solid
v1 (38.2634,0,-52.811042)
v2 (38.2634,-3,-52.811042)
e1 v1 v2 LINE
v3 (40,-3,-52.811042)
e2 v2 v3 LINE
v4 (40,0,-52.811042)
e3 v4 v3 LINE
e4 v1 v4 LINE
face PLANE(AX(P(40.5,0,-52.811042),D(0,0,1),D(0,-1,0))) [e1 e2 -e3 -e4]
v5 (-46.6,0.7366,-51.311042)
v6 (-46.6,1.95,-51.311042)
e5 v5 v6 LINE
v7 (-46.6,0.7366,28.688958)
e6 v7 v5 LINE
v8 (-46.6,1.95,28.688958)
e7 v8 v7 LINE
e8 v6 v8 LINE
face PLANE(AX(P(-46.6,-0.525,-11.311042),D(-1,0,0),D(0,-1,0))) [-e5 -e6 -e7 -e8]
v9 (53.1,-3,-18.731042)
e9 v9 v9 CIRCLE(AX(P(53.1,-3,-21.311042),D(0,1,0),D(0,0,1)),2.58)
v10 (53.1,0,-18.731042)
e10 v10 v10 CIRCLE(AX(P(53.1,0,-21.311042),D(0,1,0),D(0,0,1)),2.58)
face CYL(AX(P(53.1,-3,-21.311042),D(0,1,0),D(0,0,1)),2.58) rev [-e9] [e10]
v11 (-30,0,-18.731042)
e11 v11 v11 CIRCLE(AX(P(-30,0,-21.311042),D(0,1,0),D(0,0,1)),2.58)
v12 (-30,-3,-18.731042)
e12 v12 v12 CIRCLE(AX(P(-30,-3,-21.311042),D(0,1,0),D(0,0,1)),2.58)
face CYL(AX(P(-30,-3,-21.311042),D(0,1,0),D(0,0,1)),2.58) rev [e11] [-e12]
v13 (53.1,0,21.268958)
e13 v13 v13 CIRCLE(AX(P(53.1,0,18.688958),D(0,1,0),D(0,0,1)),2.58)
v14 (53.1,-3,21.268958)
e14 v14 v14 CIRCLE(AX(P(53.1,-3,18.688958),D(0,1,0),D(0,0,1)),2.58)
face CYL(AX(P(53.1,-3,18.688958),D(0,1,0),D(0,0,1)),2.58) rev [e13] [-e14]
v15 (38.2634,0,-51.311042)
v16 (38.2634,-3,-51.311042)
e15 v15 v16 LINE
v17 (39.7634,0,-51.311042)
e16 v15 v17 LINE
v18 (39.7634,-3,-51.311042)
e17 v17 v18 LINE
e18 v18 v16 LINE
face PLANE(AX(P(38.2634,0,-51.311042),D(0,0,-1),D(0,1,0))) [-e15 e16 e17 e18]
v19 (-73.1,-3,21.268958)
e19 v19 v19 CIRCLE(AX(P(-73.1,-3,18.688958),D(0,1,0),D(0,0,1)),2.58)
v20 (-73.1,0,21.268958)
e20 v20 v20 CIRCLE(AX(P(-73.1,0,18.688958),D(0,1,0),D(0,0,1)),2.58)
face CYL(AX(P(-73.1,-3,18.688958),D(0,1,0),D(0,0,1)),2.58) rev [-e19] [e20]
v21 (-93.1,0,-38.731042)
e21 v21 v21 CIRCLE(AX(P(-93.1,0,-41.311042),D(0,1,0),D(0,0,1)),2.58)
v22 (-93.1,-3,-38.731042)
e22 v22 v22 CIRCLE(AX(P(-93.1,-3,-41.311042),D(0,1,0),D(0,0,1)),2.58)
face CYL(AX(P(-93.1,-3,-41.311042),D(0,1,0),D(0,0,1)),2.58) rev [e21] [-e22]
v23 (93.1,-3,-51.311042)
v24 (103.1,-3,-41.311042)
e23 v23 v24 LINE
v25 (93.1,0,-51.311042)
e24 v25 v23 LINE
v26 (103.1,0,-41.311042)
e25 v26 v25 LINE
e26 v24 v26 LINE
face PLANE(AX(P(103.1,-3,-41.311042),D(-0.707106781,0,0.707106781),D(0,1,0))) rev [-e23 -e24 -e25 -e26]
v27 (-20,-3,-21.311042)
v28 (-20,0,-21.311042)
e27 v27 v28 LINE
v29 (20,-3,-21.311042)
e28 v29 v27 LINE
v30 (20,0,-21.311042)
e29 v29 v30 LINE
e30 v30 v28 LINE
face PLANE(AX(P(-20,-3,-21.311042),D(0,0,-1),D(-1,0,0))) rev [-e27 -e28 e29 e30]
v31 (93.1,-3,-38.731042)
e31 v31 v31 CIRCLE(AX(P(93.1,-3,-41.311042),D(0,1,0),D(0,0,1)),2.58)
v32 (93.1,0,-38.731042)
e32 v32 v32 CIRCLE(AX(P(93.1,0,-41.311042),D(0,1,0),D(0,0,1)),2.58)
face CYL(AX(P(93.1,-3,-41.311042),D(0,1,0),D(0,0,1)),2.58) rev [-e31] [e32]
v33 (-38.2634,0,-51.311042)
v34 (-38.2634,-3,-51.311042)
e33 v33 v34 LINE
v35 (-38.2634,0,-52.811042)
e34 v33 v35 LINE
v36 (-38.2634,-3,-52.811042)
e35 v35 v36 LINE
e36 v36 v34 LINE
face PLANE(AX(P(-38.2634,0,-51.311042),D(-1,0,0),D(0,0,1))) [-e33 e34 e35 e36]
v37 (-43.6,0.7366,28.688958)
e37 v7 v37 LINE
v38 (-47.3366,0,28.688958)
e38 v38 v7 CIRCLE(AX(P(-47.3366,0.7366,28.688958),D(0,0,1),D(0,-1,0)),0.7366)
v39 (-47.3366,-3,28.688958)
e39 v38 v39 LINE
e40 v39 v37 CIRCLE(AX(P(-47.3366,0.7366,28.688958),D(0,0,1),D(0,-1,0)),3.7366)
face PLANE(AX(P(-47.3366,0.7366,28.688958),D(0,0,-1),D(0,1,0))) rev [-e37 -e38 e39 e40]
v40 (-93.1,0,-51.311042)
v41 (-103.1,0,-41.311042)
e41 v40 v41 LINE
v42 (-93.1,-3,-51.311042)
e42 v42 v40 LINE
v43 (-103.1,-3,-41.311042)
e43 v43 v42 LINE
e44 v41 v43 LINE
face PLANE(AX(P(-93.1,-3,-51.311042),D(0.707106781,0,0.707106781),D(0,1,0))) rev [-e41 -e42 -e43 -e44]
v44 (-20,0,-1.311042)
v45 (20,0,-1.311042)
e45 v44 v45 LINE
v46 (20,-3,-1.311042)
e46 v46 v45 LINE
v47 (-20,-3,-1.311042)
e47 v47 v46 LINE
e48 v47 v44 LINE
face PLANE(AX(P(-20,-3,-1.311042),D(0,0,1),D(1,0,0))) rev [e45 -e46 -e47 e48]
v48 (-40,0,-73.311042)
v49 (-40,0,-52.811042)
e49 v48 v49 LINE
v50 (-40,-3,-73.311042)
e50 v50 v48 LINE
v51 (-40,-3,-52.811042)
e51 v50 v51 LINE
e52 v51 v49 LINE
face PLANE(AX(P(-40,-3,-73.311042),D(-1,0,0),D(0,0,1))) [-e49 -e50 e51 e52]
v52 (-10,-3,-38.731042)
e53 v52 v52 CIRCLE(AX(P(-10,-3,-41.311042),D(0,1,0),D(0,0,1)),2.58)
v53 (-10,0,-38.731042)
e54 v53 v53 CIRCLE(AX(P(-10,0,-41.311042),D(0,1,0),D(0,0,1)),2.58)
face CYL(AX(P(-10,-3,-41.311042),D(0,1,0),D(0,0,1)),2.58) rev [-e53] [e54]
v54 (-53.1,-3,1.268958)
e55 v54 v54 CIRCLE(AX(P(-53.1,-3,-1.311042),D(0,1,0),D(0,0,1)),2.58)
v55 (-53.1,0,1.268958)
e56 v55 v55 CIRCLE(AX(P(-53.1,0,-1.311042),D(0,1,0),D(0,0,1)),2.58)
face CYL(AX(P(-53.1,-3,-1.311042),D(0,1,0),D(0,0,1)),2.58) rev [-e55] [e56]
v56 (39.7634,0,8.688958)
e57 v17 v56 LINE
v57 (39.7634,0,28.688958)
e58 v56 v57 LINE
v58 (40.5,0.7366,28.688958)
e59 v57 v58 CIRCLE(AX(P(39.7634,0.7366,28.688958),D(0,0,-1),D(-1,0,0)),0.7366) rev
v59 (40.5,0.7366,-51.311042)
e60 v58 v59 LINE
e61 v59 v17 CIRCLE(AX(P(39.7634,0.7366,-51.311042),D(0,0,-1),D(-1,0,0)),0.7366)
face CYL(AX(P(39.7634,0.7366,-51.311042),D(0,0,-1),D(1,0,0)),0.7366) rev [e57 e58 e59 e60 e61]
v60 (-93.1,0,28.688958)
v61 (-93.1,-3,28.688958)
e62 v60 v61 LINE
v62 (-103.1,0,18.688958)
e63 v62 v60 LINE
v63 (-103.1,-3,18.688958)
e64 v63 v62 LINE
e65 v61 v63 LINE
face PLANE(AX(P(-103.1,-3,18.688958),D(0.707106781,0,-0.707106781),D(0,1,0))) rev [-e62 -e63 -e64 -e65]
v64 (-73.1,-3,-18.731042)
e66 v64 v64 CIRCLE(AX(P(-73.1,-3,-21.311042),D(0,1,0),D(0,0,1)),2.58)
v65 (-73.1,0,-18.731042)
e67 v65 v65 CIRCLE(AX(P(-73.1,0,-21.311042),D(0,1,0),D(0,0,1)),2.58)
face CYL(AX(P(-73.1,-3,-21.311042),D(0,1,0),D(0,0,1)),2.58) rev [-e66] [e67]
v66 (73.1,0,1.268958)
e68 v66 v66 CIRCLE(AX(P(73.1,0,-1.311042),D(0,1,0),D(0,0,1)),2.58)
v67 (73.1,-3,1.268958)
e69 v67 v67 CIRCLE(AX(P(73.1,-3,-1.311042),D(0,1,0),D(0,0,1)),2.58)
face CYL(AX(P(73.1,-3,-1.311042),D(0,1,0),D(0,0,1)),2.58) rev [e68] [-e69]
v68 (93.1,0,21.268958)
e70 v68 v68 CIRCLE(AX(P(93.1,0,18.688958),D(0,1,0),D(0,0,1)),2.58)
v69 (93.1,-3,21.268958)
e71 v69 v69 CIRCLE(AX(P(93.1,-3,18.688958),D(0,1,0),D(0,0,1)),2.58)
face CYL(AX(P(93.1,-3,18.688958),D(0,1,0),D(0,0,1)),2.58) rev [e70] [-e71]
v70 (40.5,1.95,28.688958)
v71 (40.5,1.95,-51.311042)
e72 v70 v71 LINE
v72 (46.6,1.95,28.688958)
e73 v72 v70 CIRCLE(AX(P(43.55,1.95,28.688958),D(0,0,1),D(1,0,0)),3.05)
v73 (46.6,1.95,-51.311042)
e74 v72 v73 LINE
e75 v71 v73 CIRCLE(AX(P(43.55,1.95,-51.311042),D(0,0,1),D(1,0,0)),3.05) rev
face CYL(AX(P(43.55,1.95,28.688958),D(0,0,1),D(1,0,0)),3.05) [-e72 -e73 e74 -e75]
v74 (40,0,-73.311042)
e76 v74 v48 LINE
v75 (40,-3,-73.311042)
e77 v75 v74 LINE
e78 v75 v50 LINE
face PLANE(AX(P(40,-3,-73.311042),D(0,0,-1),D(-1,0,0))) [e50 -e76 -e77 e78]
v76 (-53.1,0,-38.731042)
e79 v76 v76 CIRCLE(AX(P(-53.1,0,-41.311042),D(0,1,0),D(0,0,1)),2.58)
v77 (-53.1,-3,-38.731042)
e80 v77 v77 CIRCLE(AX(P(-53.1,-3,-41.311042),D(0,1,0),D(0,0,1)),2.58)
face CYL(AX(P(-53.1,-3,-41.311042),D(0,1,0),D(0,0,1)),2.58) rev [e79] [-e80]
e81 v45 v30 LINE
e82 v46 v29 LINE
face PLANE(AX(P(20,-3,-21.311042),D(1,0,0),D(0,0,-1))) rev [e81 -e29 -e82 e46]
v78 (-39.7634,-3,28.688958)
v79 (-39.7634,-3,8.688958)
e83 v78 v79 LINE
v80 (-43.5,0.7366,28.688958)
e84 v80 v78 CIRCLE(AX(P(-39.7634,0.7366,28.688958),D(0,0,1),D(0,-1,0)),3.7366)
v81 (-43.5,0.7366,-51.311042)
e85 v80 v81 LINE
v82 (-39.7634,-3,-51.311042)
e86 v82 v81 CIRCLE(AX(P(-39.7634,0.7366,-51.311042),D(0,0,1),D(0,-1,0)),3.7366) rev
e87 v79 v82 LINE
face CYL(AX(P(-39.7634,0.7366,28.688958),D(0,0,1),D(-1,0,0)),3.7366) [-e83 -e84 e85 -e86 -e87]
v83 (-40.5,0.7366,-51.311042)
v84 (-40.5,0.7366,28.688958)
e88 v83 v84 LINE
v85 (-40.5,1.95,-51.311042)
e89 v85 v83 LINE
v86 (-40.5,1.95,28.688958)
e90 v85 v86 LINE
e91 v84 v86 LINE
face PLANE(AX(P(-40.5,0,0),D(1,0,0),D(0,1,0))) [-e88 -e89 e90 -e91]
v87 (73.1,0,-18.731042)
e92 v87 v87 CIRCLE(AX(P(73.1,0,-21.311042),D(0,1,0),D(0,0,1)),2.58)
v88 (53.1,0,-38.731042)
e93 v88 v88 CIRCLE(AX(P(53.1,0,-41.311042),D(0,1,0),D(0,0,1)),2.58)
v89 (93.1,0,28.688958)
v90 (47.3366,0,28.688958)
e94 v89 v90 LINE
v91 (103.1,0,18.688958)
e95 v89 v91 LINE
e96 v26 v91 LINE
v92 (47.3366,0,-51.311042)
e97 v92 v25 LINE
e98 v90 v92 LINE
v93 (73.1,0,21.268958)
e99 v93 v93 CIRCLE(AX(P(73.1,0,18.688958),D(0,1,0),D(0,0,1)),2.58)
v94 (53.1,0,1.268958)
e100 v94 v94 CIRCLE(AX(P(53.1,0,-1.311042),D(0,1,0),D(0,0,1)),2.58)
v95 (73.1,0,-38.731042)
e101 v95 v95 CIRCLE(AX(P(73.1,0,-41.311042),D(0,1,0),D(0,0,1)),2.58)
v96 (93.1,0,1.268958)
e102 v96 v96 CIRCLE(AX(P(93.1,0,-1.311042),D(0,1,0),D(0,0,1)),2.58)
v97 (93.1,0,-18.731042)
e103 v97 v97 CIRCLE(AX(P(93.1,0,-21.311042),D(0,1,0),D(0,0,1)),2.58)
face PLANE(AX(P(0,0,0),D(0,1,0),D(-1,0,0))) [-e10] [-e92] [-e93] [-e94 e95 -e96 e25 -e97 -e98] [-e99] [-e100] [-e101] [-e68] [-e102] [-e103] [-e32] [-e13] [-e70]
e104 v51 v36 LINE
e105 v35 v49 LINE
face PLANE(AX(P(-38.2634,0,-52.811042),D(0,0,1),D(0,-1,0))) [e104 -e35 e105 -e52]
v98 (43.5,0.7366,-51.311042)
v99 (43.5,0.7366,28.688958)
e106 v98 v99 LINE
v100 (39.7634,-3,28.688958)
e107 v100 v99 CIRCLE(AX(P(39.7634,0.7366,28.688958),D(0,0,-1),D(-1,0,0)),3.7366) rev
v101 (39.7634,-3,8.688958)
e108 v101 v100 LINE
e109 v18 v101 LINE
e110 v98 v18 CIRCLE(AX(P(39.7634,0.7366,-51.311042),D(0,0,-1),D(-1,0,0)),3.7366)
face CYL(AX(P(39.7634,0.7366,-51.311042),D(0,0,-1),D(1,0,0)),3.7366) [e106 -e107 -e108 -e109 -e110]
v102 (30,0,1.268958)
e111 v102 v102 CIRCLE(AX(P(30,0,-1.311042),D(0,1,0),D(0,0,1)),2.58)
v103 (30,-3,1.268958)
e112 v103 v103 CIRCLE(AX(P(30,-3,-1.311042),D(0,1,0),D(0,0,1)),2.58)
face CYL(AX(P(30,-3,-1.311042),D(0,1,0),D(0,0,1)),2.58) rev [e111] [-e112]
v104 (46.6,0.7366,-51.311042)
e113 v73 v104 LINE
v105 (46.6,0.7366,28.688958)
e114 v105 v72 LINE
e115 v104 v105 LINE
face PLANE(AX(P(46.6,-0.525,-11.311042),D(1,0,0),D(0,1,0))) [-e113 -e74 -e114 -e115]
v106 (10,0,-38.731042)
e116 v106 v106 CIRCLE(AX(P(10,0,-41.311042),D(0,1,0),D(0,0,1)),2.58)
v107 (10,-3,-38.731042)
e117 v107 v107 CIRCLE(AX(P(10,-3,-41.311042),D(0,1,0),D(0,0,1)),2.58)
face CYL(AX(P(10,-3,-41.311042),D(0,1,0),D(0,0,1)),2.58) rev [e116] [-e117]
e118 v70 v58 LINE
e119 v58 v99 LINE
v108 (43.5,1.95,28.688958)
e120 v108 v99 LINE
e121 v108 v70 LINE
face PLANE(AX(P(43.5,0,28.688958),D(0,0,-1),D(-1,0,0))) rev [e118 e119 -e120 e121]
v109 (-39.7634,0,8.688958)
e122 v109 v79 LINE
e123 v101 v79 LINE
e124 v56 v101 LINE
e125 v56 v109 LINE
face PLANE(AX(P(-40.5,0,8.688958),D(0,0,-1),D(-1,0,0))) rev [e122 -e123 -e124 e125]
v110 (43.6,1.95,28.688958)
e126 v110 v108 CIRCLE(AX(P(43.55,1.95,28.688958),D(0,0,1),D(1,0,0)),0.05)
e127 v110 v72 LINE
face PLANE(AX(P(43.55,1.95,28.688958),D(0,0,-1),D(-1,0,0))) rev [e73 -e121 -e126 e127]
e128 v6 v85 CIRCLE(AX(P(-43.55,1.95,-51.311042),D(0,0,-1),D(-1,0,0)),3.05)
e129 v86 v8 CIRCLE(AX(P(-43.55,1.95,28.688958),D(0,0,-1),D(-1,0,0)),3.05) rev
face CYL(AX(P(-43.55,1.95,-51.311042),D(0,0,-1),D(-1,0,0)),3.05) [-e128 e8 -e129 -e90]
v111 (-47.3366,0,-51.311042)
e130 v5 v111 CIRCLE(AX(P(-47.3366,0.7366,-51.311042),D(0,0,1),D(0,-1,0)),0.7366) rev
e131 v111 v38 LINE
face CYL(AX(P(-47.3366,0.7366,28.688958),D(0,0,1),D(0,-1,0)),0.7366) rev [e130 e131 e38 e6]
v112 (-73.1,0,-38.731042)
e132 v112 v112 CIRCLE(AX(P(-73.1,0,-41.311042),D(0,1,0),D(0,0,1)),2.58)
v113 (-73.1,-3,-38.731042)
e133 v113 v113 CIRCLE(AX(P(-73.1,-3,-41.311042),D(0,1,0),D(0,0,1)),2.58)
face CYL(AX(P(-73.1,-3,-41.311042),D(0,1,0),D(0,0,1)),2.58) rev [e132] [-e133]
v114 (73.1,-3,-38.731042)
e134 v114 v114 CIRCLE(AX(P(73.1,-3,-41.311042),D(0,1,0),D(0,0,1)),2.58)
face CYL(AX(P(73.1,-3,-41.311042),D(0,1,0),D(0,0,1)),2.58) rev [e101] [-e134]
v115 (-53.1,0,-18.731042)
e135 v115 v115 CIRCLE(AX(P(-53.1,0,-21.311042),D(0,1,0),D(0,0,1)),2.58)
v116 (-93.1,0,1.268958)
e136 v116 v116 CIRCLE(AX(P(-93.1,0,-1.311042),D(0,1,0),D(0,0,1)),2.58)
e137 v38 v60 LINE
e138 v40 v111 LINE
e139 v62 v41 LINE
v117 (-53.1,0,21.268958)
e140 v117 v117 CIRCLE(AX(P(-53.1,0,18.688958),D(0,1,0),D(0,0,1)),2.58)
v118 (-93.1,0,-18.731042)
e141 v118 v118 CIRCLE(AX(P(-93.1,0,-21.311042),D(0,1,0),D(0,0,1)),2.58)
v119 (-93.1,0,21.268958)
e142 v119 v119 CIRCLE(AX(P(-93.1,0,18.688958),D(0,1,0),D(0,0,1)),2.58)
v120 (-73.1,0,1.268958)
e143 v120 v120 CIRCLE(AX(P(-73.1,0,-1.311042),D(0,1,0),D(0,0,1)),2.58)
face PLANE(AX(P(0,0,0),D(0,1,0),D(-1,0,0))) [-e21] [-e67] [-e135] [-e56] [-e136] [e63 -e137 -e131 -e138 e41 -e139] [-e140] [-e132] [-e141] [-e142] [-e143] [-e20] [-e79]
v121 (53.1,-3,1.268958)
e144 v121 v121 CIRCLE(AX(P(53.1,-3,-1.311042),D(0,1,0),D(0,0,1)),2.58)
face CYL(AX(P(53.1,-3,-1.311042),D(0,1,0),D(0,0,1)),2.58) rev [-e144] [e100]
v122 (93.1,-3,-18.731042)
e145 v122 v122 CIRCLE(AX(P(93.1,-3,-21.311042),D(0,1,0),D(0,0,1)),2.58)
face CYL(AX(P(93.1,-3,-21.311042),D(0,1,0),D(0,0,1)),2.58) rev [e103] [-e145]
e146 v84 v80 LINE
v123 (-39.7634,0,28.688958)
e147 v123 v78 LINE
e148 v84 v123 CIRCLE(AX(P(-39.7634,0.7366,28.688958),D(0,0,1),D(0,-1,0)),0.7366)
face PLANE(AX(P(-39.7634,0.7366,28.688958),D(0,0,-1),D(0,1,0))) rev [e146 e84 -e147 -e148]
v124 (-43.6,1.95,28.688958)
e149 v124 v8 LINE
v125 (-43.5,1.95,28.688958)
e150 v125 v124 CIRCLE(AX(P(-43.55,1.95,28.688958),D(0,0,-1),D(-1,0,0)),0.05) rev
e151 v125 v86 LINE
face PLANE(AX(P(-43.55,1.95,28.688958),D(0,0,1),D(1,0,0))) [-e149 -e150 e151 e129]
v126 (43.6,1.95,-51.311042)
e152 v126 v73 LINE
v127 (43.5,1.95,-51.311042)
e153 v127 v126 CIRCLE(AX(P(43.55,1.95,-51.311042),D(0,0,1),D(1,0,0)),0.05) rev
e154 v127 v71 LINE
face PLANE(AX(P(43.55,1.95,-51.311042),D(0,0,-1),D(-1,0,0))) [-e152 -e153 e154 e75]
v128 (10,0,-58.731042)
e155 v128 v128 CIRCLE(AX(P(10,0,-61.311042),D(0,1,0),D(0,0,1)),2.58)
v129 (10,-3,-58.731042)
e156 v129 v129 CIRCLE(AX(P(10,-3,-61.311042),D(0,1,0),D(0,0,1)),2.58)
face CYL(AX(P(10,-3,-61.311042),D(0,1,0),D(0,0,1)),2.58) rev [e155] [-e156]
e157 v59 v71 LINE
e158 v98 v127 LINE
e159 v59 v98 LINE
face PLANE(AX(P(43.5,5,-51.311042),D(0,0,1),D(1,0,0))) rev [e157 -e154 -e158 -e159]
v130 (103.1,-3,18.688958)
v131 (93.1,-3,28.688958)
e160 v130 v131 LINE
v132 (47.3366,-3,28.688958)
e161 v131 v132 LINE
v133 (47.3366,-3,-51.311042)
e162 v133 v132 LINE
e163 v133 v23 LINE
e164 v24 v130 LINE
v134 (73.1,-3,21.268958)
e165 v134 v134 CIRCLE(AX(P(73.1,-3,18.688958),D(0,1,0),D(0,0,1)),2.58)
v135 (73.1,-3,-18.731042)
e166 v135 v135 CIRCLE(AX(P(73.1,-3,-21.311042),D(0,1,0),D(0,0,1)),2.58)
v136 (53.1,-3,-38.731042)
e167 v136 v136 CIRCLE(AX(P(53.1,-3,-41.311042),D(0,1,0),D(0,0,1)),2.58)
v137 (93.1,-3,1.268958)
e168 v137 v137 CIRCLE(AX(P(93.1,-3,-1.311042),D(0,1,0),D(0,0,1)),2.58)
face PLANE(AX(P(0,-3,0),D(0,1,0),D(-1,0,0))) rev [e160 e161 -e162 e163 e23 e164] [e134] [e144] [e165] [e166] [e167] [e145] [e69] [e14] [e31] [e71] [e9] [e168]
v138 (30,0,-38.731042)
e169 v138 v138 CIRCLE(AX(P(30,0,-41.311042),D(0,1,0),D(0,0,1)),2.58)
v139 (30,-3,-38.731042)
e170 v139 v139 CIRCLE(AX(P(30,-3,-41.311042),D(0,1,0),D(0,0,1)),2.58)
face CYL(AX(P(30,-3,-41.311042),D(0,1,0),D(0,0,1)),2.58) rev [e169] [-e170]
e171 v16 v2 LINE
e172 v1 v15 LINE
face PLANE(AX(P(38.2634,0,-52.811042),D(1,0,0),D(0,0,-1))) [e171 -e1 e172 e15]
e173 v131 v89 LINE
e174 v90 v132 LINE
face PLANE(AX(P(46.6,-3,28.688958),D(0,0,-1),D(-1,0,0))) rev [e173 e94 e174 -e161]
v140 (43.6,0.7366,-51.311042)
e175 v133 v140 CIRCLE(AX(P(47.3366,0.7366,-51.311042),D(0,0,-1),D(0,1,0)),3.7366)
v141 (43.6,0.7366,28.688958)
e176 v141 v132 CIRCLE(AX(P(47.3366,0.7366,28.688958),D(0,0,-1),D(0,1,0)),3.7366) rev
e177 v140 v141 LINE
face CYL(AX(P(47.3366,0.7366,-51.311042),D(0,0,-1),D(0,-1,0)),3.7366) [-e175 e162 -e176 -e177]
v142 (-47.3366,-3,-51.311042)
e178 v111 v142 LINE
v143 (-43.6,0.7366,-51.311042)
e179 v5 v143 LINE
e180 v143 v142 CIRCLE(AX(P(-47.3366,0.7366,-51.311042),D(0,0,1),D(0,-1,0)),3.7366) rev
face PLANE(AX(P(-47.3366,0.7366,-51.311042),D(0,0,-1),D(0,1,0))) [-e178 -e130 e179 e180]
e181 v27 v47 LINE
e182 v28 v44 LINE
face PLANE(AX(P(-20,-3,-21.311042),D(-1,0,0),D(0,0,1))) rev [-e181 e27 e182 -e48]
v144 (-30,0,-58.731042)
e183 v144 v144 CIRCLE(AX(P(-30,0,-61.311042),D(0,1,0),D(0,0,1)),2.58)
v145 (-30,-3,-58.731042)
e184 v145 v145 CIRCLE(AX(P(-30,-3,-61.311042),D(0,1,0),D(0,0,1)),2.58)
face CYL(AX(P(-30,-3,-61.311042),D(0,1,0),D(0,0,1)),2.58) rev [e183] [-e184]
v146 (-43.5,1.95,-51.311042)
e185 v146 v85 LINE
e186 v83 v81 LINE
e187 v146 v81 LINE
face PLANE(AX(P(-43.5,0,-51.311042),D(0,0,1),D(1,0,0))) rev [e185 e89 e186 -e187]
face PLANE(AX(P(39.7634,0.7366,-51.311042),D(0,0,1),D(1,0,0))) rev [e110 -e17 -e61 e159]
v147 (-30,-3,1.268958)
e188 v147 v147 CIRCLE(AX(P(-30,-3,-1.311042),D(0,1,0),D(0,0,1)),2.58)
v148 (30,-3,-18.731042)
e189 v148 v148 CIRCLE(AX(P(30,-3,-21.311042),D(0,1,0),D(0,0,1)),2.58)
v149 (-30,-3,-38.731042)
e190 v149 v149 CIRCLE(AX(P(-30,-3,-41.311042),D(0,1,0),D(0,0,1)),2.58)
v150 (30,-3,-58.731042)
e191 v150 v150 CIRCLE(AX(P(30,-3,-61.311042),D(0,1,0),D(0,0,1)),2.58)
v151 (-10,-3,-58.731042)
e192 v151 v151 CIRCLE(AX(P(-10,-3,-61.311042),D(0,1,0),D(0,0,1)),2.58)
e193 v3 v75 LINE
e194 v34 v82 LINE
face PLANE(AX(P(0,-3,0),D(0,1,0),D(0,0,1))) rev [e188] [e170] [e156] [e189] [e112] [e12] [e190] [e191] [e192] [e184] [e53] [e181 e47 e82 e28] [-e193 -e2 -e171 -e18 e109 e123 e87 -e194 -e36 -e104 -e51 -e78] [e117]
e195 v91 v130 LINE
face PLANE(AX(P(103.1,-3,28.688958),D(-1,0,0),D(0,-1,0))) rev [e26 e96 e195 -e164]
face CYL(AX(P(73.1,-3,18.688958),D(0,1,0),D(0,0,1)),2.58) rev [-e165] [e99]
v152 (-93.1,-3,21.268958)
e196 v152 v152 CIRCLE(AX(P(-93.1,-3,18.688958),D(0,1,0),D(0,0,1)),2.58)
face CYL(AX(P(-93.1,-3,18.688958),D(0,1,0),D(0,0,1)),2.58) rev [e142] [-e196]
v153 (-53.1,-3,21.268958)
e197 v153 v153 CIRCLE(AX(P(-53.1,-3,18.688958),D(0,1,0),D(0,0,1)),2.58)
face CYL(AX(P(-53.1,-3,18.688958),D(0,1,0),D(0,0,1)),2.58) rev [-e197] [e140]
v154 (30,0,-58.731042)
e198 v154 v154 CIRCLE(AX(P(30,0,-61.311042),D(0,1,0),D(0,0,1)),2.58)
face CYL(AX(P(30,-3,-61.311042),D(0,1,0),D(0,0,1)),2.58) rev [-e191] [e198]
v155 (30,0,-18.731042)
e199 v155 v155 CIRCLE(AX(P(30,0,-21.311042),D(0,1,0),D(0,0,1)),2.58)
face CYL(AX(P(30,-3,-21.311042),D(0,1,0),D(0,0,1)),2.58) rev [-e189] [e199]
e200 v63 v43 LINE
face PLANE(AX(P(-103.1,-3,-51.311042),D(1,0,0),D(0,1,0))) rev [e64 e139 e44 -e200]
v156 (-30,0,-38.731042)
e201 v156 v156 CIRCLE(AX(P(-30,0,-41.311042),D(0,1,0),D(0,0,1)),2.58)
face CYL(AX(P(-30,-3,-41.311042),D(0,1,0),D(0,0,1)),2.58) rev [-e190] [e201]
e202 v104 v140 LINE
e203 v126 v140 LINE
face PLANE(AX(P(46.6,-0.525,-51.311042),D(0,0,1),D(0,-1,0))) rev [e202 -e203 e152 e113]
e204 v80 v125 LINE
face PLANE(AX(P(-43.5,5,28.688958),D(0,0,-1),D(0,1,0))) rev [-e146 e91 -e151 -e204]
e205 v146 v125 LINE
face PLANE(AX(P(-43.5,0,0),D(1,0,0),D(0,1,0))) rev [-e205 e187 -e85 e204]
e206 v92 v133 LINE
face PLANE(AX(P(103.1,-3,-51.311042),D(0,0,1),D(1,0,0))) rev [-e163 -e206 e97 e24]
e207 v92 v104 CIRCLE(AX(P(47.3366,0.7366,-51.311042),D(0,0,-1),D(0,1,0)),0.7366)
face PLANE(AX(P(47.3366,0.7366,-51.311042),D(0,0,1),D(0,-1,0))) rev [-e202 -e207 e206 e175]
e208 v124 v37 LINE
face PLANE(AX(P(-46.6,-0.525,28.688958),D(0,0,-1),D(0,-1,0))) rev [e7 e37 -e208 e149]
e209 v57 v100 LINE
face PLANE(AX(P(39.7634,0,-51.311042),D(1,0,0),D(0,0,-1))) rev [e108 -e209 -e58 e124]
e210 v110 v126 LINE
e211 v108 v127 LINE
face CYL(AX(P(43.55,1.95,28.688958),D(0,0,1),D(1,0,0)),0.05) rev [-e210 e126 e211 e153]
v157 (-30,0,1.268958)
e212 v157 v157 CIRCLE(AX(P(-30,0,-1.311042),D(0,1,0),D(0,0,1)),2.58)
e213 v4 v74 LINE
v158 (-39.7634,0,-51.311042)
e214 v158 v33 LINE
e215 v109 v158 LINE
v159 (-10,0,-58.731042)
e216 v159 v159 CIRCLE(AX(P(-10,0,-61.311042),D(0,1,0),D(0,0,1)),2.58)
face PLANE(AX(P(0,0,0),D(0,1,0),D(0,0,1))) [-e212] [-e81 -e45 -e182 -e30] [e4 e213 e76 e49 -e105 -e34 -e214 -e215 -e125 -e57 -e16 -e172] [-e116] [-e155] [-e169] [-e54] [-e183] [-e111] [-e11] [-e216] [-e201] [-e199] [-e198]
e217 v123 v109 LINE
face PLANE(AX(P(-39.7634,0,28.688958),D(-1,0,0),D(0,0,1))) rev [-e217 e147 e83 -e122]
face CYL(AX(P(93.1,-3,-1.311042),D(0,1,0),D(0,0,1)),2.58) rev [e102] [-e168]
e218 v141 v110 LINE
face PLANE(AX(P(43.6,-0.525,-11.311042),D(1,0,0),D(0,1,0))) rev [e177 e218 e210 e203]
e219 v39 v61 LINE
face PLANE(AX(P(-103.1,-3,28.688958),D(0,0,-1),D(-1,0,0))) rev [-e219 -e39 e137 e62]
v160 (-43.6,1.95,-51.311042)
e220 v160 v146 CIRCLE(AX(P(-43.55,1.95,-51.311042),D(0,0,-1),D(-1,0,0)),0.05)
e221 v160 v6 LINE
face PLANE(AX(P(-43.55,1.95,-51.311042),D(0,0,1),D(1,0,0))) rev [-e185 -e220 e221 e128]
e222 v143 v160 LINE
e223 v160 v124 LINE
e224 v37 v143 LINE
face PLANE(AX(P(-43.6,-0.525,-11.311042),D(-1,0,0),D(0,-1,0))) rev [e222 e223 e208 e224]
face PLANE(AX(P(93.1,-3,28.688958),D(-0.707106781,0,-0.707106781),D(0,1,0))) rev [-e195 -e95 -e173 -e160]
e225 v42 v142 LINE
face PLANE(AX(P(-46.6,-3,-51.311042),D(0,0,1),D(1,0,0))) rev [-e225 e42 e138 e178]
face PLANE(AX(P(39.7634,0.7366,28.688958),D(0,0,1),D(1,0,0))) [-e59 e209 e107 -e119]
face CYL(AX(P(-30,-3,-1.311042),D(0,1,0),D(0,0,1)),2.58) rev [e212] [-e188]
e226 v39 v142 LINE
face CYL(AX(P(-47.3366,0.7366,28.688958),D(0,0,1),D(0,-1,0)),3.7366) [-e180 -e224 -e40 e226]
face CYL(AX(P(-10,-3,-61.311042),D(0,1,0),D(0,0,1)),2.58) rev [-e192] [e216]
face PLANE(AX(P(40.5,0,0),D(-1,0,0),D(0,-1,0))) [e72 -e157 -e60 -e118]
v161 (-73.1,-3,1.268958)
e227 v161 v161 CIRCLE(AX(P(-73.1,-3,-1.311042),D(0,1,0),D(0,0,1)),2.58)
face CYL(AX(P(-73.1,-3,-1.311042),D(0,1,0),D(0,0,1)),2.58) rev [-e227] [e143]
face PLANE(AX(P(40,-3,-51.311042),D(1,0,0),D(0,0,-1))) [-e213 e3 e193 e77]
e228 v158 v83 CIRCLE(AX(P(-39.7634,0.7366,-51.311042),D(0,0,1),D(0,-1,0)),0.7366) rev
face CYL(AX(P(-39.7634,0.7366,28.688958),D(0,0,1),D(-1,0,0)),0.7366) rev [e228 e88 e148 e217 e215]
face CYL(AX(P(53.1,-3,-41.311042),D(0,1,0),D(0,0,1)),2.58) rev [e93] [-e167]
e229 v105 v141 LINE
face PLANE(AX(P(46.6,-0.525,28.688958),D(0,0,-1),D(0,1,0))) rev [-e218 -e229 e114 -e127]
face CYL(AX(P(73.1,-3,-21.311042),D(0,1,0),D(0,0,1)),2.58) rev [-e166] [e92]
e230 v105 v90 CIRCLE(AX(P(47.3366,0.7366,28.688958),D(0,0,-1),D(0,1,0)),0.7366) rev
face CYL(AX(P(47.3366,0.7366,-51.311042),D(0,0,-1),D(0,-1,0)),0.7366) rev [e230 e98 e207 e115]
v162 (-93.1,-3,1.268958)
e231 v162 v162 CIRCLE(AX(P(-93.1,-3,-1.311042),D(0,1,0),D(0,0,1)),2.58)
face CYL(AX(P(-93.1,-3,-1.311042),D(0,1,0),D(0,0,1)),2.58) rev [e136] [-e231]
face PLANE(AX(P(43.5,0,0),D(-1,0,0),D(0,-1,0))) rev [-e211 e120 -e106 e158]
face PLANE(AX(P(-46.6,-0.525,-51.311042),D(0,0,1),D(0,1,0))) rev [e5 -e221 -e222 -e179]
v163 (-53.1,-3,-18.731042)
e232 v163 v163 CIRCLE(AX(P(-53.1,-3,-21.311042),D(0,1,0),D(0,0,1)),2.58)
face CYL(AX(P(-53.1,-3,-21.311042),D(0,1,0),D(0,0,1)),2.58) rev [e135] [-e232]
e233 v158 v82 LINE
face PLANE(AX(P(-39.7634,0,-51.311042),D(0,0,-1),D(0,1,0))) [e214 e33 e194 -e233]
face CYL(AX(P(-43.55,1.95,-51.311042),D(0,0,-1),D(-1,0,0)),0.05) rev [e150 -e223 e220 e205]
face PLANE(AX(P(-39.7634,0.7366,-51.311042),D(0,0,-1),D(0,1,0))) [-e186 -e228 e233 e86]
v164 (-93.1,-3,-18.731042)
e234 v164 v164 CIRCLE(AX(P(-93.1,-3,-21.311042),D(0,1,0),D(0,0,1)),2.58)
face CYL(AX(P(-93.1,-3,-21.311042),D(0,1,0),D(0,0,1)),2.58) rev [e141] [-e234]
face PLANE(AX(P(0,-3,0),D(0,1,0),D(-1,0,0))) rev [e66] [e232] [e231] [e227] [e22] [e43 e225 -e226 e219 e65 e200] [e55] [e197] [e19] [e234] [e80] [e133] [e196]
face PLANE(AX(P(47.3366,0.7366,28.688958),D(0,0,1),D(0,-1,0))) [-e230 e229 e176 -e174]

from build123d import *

# Parameters (mm, degrees)
BASE_FLANGE1_DEPTH              = 3
EDGE_FLANGE1_STRIP_W            = 13.4732
EDGE_FLANGE1_STRIP_H            = 3
EDGE_FLANGE1_STRIP_CUT_DEPTH    = 80
EDGE_FLANGE1_RELIEF_W           = 14.9732
EDGE_FLANGE1_RELIEF_H           = 1.5
EDGE_FLANGE1_RELIEF_CUT_DEPTH   = 3
EDGE_FLANGE1_STRIP_2_W          = 13.4732
EDGE_FLANGE1_STRIP_2_H          = 3
EDGE_FLANGE1_STRIP_CUT_2_DEPTH  = 80
EDGE_FLANGE1_RELIEF_2_W         = 14.9732
EDGE_FLANGE1_RELIEF_2_H         = 1.5
EDGE_FLANGE1_RELIEF_CUT_2_DEPTH = 3
EDGE_FLANGE1_DEPTH              = 80
EDGE_FLANGE1_BEND_DEPTH         = 80
HEM1_START                      = -51.311042424
HEM1_DEPTH                      = 80
HEM1_2_DEPTH                    = 80
EDGE_FLANGE2_STRIP_W            = 13.4732
EDGE_FLANGE2_STRIP_H            = 3
EDGE_FLANGE2_STRIP_CUT_DEPTH    = 80
EDGE_FLANGE2_STRIP_2_W          = 13.4732
EDGE_FLANGE2_STRIP_2_H          = 3
EDGE_FLANGE2_STRIP_CUT_2_DEPTH  = 80
EDGE_FLANGE2_DEPTH              = 80
EDGE_FLANGE2_BEND_DEPTH         = 80
CHAMFER1_SIZE                   = 10
SKETCH24_W                      = 40
SKETCH24_H                      = 20
CUT_EXTRUDE1_DEPTH              = 3
SKETCH25_R                      = 2.58
CUT_EXTRUDE3_DEPTH              = 3
CUT_EXTRUDE2_START              = -3
CUT_EXTRUDE2_OUTLINE_W          = 79.5268
CUT_EXTRUDE2_OUTLINE_H          = 20
CUT_EXTRUDE2_DEPTH              = 3


# Read off the part's stored shape, not the designer's step: Hem1, Cut-Extrude2
# Sheet-metal steps are written as plain solids
with BuildPart() as part:
    # Sketch1 → Base-Flange1 (new body)
    with BuildSketch(Plane(origin=(0, 0, 0), x_dir=(1, 0, 0), z_dir=(0, 1, 0))):
        Polygon((-40.5, 51.311042424), (-40.5, -28.688957576), (40.5, -28.688957576), (40.5, 51.311042424), (40, 51.311042424), (40, 73.311042424), (-40, 73.311042424), (-40, 51.311042424), align=None)
    extrude(amount=-BASE_FLANGE1_DEPTH)

    # Edge-Flange1 strip (across the edge) → Edge-Flange1 strip cut (cut)
    with BuildSketch(Plane(origin=(40.5, 0, 28.688957576), x_dir=(-1, 0, 0), z_dir=(0, 0, -1))):
        with Locations((-6, -1.5)):
            Rectangle(EDGE_FLANGE1_STRIP_W, EDGE_FLANGE1_STRIP_H)
    extrude(amount=EDGE_FLANGE1_STRIP_CUT_DEPTH, mode=Mode.SUBTRACT)

    # Edge-Flange1 relief (on the sheet) → Edge-Flange1 relief cut (cut)
    with BuildSketch(Plane(origin=(39.7634, 0, 28.688957576), x_dir=(-1, 0, 0), z_dir=(0, 1, 0))):
        with Locations((-5.9866, -80.75)):
            Rectangle(EDGE_FLANGE1_RELIEF_W, EDGE_FLANGE1_RELIEF_H)
    extrude(amount=-EDGE_FLANGE1_RELIEF_CUT_DEPTH, mode=Mode.SUBTRACT)

    # Edge-Flange1 strip 2 (across the edge) → Edge-Flange1 strip cut 2 (cut)
    with BuildSketch(Plane(origin=(-40.5, 0, -51.311042424), x_dir=(1, 0, 0), z_dir=(0, 0, 1))):
        with Locations((-6, -1.5)):
            Rectangle(EDGE_FLANGE1_STRIP_2_W, EDGE_FLANGE1_STRIP_2_H)
    extrude(amount=EDGE_FLANGE1_STRIP_CUT_2_DEPTH, mode=Mode.SUBTRACT)

    # Edge-Flange1 relief 2 (on the sheet) → Edge-Flange1 relief cut 2 (cut)
    with BuildSketch(Plane(origin=(-39.7634, 0, -51.311042424), x_dir=(1, 0, 0), z_dir=(0, 1, 0))):
        with Locations((-5.9866, 0.75)):
            Rectangle(EDGE_FLANGE1_RELIEF_2_W, EDGE_FLANGE1_RELIEF_2_H)
    extrude(amount=-EDGE_FLANGE1_RELIEF_CUT_2_DEPTH, mode=Mode.SUBTRACT)

    # Edge-Flange1 section (across the edge) → Edge-Flange1 (add)
    with BuildSketch(Plane(origin=(40.5, 0, 28.688957576), x_dir=(-1, 0, 0), z_dir=(0, 0, -1))):
        with BuildLine():
            Line((-3, 0.7366), (-3, 5))
            Line((-3, 5), (0, 5))
            Line((0, 5), (0, 0.7366))
            ThreePointArc((0, 0.7366), (0.215745145, 0.215745145), (0.7366, 0))
            Line((0.7366, 0), (0.7366, -3))
            ThreePointArc((0.7366, -3), (-1.905575199, -1.905575199), (-3, 0.7366))
        make_face()
    extrude(amount=EDGE_FLANGE1_DEPTH)

    # Edge-Flange1 section 2 (across the edge) → Edge-Flange1 bend (add)
    with BuildSketch(Plane(origin=(-40.5, 0, -51.311042424), x_dir=(1, 0, 0), z_dir=(0, 0, 1))):
        with BuildLine():
            Line((-3, 0.7366), (-3, 5))
            Line((-3, 5), (0, 5))
            Line((0, 5), (0, 0.7366))
            ThreePointArc((0, 0.7366), (0.215745145, 0.215745145), (0.7366, 0))
            Line((0.7366, 0), (0.7366, -3))
            ThreePointArc((0.7366, -3), (-1.905575199, -1.905575199), (-3, 0.7366))
        make_face()
    extrude(amount=EDGE_FLANGE1_BEND_DEPTH)

    # Hem1 outline → Hem1 (cut)
    with BuildSketch(Plane.XY.offset(HEM1_START)):
        with BuildLine():
            ThreePointArc((40.5, 1.95), (41.375718509, 4.088924964), (43.5, 4.999590136))
            Line((43.5, 4.999590136), (43.5, 5))
            Line((43.5, 5), (40.5, 5))
            Line((40.5, 5), (40.5, 1.95))
        make_face()
        with BuildLine():
            Line((-43.5, 5), (-43.5, 4.999590136))
            ThreePointArc((-43.5, 4.999590136), (-41.375718509, 4.088924964), (-40.5, 1.95))
            Line((-40.5, 1.95), (-40.5, 5))
            Line((-40.5, 5), (-43.5, 5))
        make_face()
    extrude(amount=HEM1_DEPTH, mode=Mode.SUBTRACT)

    # Hem1 2 outline → Hem1 2 (add)
    with BuildSketch(Plane.XY.offset(HEM1_START)):
        with BuildLine():
            Line((43.6, -3), (46.6, -3))
            Line((46.6, -3), (46.6, 1.95))
            ThreePointArc((46.6, 1.95), (45.688924964, 4.124281491), (43.5, 4.999590136))
            Line((43.5, 4.999590136), (43.5, 1.95))
            ThreePointArc((43.5, 1.95), (43.55, 2), (43.6, 1.95))
            Line((43.6, 1.95), (43.6, -3))
        make_face()
        with BuildLine():
            Line((-46.6, -3), (-43.6, -3))
            Line((-43.6, -3), (-43.6, 1.95))
            ThreePointArc((-43.6, 1.95), (-43.55, 2), (-43.5, 1.95))
            Line((-43.5, 1.95), (-43.5, 4.999590136))
            ThreePointArc((-43.5, 4.999590136), (-45.688924964, 4.124281491), (-46.6, 1.95))
            Line((-46.6, 1.95), (-46.6, -3))
        make_face()
    extrude(amount=HEM1_2_DEPTH)

    # Edge-Flange2 strip (across the edge) → Edge-Flange2 strip cut (cut)
    with BuildSketch(Plane(origin=(46.6, -3, 28.688957576), x_dir=(0, 1, 0), z_dir=(0, 0, -1))):
        with Locations((-3, -1.5)):
            Rectangle(EDGE_FLANGE2_STRIP_W, EDGE_FLANGE2_STRIP_H)
    extrude(amount=EDGE_FLANGE2_STRIP_CUT_DEPTH, mode=Mode.SUBTRACT)

    # Edge-Flange2 strip 2 (across the edge) → Edge-Flange2 strip cut 2 (cut)
    with BuildSketch(Plane(origin=(-46.6, -3, -51.311042424), x_dir=(0, 1, 0), z_dir=(0, 0, 1))):
        with Locations((-3, -1.5)):
            Rectangle(EDGE_FLANGE2_STRIP_2_W, EDGE_FLANGE2_STRIP_2_H)
    extrude(amount=EDGE_FLANGE2_STRIP_CUT_2_DEPTH, mode=Mode.SUBTRACT)

    # Edge-Flange2 section (across the edge) → Edge-Flange2 (add)
    with BuildSketch(Plane(origin=(46.6, -3, 28.688957576), x_dir=(0, 1, 0), z_dir=(0, 0, -1))):
        with BuildLine():
            Line((0, 0.7366), (0, 56.5))
            Line((0, 56.5), (3, 56.5))
            Line((3, 56.5), (3, 0.7366))
            ThreePointArc((3, 0.7366), (3.215745145, 0.215745145), (3.7366, 0))
            Line((3.7366, 0), (3.7366, -3))
            ThreePointArc((3.7366, -3), (1.094424801, -1.905575199), (0, 0.7366))
        make_face()
    extrude(amount=EDGE_FLANGE2_DEPTH)

    # Edge-Flange2 section 2 (across the edge) → Edge-Flange2 bend (add)
    with BuildSketch(Plane(origin=(-46.6, -3, -51.311042424), x_dir=(0, 1, 0), z_dir=(0, 0, 1))):
        with BuildLine():
            Line((0, 0.7366), (0, 56.5))
            Line((0, 56.5), (3, 56.5))
            Line((3, 56.5), (3, 0.7366))
            ThreePointArc((3, 0.7366), (3.215745145, 0.215745145), (3.7366, 0))
            Line((3.7366, 0), (3.7366, -3))
            ThreePointArc((3.7366, -3), (1.094424801, -1.905575199), (0, 0.7366))
        make_face()
    extrude(amount=EDGE_FLANGE2_BEND_DEPTH)

    # Chamfer1
    chamfer1_edges = [part.edges().sort_by_distance(p)[0] for p in [
        (103.1, -1.5, 28.688957576),
        (103.1, -1.5, -51.311042424),
        (-103.1, -1.5, -51.311042424),
        (-103.1, -1.5, 28.688957576),
    ]]
    chamfer(chamfer1_edges, length=CHAMFER1_SIZE)

    # Sketch24 → Cut-Extrude1 (cut)
    with BuildSketch(Plane(origin=(0, 0, 0), x_dir=(1, 0, 0), z_dir=(0, 1, 0))):
        with Locations((0, 11.311042424)):
            Rectangle(SKETCH24_W, SKETCH24_H)
    extrude(amount=-CUT_EXTRUDE1_DEPTH, mode=Mode.SUBTRACT)

    # Sketch25 → Cut-Extrude3 (cut)
    with BuildSketch(Plane(origin=(0, 0, 0), x_dir=(1, 0, 0), z_dir=(0, 1, 0))):
        with Locations(Location((-30, 61.311042424, 0), (0, 0, 270))):
            Circle(SKETCH25_R)
        with Locations(Location((-10, 61.311042424, 0), (0, 0, 270))):
            Circle(SKETCH25_R)
        with Locations(Location((10, 61.311042424, 0), (0, 0, 270))):
            Circle(SKETCH25_R)
        with Locations(Location((30, 61.311042424, 0), (0, 0, 270))):
            Circle(SKETCH25_R)
        with Locations(Location((30, 41.311042424, 0), (0, 0, 270))):
            Circle(SKETCH25_R)
        with Locations(Location((10, 41.311042424, 0), (0, 0, 270))):
            Circle(SKETCH25_R)
        with Locations(Location((-10, 41.311042424, 0), (0, 0, 270))):
            Circle(SKETCH25_R)
        with Locations(Location((-30, 41.311042424, 0), (0, 0, 270))):
            Circle(SKETCH25_R)
        with Locations(Location((-30, 21.311042424, 0), (0, 0, 270))):
            Circle(SKETCH25_R)
        with Locations(Location((-30, 1.311042424, 0), (0, 0, 270))):
            Circle(SKETCH25_R)
        with Locations(Location((30, 21.311042424, 0), (0, 0, 270))):
            Circle(SKETCH25_R)
        with Locations(Location((30, 1.311042424, 0), (0, 0, 270))):
            Circle(SKETCH25_R)
        with Locations(Location((-93.1, 41.311042424, 0), (0, 0, 270))):
            Circle(SKETCH25_R)
        with Locations(Location((-73.1, 41.311042424, 0), (0, 0, 270))):
            Circle(SKETCH25_R)
        with Locations(Location((-53.1, 41.311042424, 0), (0, 0, 270))):
            Circle(SKETCH25_R)
        with Locations(Location((-93.1, 21.311042424, 0), (0, 0, 270))):
            Circle(SKETCH25_R)
        with Locations(Location((-73.1, 21.311042424, 0), (0, 0, 270))):
            Circle(SKETCH25_R)
        with Locations(Location((-53.1, 21.311042424, 0), (0, 0, 270))):
            Circle(SKETCH25_R)
        with Locations(Location((-93.1, 1.311042424, 0), (0, 0, 270))):
            Circle(SKETCH25_R)
        with Locations(Location((-73.1, 1.311042424, 0), (0, 0, 270))):
            Circle(SKETCH25_R)
        with Locations(Location((-53.1, 1.311042424, 0), (0, 0, 270))):
            Circle(SKETCH25_R)
        with Locations(Location((-53.1, -18.688957576, 0), (0, 0, 270))):
            Circle(SKETCH25_R)
        with Locations(Location((-73.1, -18.688957576, 0), (0, 0, 270))):
            Circle(SKETCH25_R)
        with Locations(Location((-93.1, -18.688957576, 0), (0, 0, 270))):
            Circle(SKETCH25_R)
        with Locations(Location((53.1, 41.311042424, 0), (0, 0, 270))):
            Circle(SKETCH25_R)
        with Locations(Location((73.1, 41.311042424, 0), (0, 0, 270))):
            Circle(SKETCH25_R)
        with Locations(Location((93.1, 41.311042424, 0), (0, 0, 270))):
            Circle(SKETCH25_R)
        with Locations(Location((53.1, 21.311042424, 0), (0, 0, 270))):
            Circle(SKETCH25_R)
        with Locations(Location((73.1, 21.311042424, 0), (0, 0, 270))):
            Circle(SKETCH25_R)
        with Locations(Location((93.1, 21.311042424, 0), (0, 0, 270))):
            Circle(SKETCH25_R)
        with Locations(Location((53.1, 1.311042424, 0), (0, 0, 270))):
            Circle(SKETCH25_R)
        with Locations(Location((73.1, 1.311042424, 0), (0, 0, 270))):
            Circle(SKETCH25_R)
        with Locations(Location((93.1, 1.311042424, 0), (0, 0, 270))):
            Circle(SKETCH25_R)
        with Locations(Location((53.1, -18.688957576, 0), (0, 0, 270))):
            Circle(SKETCH25_R)
        with Locations(Location((73.1, -18.688957576, 0), (0, 0, 270))):
            Circle(SKETCH25_R)
        with Locations(Location((93.1, -18.688957576, 0), (0, 0, 270))):
            Circle(SKETCH25_R)
    extrude(amount=-CUT_EXTRUDE3_DEPTH, mode=Mode.SUBTRACT)

    # Cut-Extrude2 outline → Cut-Extrude2 (cut)
    with BuildSketch(Plane(origin=(0, 0, 0), x_dir=(1, 0, 0), z_dir=(0, 1, 0)).offset(CUT_EXTRUDE2_START)):
        with Locations((0, -18.688957576)):
            Rectangle(CUT_EXTRUDE2_OUTLINE_W, CUT_EXTRUDE2_OUTLINE_H)
    extrude(amount=CUT_EXTRUDE2_DEPTH, mode=Mode.SUBTRACT)


solid = part.part
